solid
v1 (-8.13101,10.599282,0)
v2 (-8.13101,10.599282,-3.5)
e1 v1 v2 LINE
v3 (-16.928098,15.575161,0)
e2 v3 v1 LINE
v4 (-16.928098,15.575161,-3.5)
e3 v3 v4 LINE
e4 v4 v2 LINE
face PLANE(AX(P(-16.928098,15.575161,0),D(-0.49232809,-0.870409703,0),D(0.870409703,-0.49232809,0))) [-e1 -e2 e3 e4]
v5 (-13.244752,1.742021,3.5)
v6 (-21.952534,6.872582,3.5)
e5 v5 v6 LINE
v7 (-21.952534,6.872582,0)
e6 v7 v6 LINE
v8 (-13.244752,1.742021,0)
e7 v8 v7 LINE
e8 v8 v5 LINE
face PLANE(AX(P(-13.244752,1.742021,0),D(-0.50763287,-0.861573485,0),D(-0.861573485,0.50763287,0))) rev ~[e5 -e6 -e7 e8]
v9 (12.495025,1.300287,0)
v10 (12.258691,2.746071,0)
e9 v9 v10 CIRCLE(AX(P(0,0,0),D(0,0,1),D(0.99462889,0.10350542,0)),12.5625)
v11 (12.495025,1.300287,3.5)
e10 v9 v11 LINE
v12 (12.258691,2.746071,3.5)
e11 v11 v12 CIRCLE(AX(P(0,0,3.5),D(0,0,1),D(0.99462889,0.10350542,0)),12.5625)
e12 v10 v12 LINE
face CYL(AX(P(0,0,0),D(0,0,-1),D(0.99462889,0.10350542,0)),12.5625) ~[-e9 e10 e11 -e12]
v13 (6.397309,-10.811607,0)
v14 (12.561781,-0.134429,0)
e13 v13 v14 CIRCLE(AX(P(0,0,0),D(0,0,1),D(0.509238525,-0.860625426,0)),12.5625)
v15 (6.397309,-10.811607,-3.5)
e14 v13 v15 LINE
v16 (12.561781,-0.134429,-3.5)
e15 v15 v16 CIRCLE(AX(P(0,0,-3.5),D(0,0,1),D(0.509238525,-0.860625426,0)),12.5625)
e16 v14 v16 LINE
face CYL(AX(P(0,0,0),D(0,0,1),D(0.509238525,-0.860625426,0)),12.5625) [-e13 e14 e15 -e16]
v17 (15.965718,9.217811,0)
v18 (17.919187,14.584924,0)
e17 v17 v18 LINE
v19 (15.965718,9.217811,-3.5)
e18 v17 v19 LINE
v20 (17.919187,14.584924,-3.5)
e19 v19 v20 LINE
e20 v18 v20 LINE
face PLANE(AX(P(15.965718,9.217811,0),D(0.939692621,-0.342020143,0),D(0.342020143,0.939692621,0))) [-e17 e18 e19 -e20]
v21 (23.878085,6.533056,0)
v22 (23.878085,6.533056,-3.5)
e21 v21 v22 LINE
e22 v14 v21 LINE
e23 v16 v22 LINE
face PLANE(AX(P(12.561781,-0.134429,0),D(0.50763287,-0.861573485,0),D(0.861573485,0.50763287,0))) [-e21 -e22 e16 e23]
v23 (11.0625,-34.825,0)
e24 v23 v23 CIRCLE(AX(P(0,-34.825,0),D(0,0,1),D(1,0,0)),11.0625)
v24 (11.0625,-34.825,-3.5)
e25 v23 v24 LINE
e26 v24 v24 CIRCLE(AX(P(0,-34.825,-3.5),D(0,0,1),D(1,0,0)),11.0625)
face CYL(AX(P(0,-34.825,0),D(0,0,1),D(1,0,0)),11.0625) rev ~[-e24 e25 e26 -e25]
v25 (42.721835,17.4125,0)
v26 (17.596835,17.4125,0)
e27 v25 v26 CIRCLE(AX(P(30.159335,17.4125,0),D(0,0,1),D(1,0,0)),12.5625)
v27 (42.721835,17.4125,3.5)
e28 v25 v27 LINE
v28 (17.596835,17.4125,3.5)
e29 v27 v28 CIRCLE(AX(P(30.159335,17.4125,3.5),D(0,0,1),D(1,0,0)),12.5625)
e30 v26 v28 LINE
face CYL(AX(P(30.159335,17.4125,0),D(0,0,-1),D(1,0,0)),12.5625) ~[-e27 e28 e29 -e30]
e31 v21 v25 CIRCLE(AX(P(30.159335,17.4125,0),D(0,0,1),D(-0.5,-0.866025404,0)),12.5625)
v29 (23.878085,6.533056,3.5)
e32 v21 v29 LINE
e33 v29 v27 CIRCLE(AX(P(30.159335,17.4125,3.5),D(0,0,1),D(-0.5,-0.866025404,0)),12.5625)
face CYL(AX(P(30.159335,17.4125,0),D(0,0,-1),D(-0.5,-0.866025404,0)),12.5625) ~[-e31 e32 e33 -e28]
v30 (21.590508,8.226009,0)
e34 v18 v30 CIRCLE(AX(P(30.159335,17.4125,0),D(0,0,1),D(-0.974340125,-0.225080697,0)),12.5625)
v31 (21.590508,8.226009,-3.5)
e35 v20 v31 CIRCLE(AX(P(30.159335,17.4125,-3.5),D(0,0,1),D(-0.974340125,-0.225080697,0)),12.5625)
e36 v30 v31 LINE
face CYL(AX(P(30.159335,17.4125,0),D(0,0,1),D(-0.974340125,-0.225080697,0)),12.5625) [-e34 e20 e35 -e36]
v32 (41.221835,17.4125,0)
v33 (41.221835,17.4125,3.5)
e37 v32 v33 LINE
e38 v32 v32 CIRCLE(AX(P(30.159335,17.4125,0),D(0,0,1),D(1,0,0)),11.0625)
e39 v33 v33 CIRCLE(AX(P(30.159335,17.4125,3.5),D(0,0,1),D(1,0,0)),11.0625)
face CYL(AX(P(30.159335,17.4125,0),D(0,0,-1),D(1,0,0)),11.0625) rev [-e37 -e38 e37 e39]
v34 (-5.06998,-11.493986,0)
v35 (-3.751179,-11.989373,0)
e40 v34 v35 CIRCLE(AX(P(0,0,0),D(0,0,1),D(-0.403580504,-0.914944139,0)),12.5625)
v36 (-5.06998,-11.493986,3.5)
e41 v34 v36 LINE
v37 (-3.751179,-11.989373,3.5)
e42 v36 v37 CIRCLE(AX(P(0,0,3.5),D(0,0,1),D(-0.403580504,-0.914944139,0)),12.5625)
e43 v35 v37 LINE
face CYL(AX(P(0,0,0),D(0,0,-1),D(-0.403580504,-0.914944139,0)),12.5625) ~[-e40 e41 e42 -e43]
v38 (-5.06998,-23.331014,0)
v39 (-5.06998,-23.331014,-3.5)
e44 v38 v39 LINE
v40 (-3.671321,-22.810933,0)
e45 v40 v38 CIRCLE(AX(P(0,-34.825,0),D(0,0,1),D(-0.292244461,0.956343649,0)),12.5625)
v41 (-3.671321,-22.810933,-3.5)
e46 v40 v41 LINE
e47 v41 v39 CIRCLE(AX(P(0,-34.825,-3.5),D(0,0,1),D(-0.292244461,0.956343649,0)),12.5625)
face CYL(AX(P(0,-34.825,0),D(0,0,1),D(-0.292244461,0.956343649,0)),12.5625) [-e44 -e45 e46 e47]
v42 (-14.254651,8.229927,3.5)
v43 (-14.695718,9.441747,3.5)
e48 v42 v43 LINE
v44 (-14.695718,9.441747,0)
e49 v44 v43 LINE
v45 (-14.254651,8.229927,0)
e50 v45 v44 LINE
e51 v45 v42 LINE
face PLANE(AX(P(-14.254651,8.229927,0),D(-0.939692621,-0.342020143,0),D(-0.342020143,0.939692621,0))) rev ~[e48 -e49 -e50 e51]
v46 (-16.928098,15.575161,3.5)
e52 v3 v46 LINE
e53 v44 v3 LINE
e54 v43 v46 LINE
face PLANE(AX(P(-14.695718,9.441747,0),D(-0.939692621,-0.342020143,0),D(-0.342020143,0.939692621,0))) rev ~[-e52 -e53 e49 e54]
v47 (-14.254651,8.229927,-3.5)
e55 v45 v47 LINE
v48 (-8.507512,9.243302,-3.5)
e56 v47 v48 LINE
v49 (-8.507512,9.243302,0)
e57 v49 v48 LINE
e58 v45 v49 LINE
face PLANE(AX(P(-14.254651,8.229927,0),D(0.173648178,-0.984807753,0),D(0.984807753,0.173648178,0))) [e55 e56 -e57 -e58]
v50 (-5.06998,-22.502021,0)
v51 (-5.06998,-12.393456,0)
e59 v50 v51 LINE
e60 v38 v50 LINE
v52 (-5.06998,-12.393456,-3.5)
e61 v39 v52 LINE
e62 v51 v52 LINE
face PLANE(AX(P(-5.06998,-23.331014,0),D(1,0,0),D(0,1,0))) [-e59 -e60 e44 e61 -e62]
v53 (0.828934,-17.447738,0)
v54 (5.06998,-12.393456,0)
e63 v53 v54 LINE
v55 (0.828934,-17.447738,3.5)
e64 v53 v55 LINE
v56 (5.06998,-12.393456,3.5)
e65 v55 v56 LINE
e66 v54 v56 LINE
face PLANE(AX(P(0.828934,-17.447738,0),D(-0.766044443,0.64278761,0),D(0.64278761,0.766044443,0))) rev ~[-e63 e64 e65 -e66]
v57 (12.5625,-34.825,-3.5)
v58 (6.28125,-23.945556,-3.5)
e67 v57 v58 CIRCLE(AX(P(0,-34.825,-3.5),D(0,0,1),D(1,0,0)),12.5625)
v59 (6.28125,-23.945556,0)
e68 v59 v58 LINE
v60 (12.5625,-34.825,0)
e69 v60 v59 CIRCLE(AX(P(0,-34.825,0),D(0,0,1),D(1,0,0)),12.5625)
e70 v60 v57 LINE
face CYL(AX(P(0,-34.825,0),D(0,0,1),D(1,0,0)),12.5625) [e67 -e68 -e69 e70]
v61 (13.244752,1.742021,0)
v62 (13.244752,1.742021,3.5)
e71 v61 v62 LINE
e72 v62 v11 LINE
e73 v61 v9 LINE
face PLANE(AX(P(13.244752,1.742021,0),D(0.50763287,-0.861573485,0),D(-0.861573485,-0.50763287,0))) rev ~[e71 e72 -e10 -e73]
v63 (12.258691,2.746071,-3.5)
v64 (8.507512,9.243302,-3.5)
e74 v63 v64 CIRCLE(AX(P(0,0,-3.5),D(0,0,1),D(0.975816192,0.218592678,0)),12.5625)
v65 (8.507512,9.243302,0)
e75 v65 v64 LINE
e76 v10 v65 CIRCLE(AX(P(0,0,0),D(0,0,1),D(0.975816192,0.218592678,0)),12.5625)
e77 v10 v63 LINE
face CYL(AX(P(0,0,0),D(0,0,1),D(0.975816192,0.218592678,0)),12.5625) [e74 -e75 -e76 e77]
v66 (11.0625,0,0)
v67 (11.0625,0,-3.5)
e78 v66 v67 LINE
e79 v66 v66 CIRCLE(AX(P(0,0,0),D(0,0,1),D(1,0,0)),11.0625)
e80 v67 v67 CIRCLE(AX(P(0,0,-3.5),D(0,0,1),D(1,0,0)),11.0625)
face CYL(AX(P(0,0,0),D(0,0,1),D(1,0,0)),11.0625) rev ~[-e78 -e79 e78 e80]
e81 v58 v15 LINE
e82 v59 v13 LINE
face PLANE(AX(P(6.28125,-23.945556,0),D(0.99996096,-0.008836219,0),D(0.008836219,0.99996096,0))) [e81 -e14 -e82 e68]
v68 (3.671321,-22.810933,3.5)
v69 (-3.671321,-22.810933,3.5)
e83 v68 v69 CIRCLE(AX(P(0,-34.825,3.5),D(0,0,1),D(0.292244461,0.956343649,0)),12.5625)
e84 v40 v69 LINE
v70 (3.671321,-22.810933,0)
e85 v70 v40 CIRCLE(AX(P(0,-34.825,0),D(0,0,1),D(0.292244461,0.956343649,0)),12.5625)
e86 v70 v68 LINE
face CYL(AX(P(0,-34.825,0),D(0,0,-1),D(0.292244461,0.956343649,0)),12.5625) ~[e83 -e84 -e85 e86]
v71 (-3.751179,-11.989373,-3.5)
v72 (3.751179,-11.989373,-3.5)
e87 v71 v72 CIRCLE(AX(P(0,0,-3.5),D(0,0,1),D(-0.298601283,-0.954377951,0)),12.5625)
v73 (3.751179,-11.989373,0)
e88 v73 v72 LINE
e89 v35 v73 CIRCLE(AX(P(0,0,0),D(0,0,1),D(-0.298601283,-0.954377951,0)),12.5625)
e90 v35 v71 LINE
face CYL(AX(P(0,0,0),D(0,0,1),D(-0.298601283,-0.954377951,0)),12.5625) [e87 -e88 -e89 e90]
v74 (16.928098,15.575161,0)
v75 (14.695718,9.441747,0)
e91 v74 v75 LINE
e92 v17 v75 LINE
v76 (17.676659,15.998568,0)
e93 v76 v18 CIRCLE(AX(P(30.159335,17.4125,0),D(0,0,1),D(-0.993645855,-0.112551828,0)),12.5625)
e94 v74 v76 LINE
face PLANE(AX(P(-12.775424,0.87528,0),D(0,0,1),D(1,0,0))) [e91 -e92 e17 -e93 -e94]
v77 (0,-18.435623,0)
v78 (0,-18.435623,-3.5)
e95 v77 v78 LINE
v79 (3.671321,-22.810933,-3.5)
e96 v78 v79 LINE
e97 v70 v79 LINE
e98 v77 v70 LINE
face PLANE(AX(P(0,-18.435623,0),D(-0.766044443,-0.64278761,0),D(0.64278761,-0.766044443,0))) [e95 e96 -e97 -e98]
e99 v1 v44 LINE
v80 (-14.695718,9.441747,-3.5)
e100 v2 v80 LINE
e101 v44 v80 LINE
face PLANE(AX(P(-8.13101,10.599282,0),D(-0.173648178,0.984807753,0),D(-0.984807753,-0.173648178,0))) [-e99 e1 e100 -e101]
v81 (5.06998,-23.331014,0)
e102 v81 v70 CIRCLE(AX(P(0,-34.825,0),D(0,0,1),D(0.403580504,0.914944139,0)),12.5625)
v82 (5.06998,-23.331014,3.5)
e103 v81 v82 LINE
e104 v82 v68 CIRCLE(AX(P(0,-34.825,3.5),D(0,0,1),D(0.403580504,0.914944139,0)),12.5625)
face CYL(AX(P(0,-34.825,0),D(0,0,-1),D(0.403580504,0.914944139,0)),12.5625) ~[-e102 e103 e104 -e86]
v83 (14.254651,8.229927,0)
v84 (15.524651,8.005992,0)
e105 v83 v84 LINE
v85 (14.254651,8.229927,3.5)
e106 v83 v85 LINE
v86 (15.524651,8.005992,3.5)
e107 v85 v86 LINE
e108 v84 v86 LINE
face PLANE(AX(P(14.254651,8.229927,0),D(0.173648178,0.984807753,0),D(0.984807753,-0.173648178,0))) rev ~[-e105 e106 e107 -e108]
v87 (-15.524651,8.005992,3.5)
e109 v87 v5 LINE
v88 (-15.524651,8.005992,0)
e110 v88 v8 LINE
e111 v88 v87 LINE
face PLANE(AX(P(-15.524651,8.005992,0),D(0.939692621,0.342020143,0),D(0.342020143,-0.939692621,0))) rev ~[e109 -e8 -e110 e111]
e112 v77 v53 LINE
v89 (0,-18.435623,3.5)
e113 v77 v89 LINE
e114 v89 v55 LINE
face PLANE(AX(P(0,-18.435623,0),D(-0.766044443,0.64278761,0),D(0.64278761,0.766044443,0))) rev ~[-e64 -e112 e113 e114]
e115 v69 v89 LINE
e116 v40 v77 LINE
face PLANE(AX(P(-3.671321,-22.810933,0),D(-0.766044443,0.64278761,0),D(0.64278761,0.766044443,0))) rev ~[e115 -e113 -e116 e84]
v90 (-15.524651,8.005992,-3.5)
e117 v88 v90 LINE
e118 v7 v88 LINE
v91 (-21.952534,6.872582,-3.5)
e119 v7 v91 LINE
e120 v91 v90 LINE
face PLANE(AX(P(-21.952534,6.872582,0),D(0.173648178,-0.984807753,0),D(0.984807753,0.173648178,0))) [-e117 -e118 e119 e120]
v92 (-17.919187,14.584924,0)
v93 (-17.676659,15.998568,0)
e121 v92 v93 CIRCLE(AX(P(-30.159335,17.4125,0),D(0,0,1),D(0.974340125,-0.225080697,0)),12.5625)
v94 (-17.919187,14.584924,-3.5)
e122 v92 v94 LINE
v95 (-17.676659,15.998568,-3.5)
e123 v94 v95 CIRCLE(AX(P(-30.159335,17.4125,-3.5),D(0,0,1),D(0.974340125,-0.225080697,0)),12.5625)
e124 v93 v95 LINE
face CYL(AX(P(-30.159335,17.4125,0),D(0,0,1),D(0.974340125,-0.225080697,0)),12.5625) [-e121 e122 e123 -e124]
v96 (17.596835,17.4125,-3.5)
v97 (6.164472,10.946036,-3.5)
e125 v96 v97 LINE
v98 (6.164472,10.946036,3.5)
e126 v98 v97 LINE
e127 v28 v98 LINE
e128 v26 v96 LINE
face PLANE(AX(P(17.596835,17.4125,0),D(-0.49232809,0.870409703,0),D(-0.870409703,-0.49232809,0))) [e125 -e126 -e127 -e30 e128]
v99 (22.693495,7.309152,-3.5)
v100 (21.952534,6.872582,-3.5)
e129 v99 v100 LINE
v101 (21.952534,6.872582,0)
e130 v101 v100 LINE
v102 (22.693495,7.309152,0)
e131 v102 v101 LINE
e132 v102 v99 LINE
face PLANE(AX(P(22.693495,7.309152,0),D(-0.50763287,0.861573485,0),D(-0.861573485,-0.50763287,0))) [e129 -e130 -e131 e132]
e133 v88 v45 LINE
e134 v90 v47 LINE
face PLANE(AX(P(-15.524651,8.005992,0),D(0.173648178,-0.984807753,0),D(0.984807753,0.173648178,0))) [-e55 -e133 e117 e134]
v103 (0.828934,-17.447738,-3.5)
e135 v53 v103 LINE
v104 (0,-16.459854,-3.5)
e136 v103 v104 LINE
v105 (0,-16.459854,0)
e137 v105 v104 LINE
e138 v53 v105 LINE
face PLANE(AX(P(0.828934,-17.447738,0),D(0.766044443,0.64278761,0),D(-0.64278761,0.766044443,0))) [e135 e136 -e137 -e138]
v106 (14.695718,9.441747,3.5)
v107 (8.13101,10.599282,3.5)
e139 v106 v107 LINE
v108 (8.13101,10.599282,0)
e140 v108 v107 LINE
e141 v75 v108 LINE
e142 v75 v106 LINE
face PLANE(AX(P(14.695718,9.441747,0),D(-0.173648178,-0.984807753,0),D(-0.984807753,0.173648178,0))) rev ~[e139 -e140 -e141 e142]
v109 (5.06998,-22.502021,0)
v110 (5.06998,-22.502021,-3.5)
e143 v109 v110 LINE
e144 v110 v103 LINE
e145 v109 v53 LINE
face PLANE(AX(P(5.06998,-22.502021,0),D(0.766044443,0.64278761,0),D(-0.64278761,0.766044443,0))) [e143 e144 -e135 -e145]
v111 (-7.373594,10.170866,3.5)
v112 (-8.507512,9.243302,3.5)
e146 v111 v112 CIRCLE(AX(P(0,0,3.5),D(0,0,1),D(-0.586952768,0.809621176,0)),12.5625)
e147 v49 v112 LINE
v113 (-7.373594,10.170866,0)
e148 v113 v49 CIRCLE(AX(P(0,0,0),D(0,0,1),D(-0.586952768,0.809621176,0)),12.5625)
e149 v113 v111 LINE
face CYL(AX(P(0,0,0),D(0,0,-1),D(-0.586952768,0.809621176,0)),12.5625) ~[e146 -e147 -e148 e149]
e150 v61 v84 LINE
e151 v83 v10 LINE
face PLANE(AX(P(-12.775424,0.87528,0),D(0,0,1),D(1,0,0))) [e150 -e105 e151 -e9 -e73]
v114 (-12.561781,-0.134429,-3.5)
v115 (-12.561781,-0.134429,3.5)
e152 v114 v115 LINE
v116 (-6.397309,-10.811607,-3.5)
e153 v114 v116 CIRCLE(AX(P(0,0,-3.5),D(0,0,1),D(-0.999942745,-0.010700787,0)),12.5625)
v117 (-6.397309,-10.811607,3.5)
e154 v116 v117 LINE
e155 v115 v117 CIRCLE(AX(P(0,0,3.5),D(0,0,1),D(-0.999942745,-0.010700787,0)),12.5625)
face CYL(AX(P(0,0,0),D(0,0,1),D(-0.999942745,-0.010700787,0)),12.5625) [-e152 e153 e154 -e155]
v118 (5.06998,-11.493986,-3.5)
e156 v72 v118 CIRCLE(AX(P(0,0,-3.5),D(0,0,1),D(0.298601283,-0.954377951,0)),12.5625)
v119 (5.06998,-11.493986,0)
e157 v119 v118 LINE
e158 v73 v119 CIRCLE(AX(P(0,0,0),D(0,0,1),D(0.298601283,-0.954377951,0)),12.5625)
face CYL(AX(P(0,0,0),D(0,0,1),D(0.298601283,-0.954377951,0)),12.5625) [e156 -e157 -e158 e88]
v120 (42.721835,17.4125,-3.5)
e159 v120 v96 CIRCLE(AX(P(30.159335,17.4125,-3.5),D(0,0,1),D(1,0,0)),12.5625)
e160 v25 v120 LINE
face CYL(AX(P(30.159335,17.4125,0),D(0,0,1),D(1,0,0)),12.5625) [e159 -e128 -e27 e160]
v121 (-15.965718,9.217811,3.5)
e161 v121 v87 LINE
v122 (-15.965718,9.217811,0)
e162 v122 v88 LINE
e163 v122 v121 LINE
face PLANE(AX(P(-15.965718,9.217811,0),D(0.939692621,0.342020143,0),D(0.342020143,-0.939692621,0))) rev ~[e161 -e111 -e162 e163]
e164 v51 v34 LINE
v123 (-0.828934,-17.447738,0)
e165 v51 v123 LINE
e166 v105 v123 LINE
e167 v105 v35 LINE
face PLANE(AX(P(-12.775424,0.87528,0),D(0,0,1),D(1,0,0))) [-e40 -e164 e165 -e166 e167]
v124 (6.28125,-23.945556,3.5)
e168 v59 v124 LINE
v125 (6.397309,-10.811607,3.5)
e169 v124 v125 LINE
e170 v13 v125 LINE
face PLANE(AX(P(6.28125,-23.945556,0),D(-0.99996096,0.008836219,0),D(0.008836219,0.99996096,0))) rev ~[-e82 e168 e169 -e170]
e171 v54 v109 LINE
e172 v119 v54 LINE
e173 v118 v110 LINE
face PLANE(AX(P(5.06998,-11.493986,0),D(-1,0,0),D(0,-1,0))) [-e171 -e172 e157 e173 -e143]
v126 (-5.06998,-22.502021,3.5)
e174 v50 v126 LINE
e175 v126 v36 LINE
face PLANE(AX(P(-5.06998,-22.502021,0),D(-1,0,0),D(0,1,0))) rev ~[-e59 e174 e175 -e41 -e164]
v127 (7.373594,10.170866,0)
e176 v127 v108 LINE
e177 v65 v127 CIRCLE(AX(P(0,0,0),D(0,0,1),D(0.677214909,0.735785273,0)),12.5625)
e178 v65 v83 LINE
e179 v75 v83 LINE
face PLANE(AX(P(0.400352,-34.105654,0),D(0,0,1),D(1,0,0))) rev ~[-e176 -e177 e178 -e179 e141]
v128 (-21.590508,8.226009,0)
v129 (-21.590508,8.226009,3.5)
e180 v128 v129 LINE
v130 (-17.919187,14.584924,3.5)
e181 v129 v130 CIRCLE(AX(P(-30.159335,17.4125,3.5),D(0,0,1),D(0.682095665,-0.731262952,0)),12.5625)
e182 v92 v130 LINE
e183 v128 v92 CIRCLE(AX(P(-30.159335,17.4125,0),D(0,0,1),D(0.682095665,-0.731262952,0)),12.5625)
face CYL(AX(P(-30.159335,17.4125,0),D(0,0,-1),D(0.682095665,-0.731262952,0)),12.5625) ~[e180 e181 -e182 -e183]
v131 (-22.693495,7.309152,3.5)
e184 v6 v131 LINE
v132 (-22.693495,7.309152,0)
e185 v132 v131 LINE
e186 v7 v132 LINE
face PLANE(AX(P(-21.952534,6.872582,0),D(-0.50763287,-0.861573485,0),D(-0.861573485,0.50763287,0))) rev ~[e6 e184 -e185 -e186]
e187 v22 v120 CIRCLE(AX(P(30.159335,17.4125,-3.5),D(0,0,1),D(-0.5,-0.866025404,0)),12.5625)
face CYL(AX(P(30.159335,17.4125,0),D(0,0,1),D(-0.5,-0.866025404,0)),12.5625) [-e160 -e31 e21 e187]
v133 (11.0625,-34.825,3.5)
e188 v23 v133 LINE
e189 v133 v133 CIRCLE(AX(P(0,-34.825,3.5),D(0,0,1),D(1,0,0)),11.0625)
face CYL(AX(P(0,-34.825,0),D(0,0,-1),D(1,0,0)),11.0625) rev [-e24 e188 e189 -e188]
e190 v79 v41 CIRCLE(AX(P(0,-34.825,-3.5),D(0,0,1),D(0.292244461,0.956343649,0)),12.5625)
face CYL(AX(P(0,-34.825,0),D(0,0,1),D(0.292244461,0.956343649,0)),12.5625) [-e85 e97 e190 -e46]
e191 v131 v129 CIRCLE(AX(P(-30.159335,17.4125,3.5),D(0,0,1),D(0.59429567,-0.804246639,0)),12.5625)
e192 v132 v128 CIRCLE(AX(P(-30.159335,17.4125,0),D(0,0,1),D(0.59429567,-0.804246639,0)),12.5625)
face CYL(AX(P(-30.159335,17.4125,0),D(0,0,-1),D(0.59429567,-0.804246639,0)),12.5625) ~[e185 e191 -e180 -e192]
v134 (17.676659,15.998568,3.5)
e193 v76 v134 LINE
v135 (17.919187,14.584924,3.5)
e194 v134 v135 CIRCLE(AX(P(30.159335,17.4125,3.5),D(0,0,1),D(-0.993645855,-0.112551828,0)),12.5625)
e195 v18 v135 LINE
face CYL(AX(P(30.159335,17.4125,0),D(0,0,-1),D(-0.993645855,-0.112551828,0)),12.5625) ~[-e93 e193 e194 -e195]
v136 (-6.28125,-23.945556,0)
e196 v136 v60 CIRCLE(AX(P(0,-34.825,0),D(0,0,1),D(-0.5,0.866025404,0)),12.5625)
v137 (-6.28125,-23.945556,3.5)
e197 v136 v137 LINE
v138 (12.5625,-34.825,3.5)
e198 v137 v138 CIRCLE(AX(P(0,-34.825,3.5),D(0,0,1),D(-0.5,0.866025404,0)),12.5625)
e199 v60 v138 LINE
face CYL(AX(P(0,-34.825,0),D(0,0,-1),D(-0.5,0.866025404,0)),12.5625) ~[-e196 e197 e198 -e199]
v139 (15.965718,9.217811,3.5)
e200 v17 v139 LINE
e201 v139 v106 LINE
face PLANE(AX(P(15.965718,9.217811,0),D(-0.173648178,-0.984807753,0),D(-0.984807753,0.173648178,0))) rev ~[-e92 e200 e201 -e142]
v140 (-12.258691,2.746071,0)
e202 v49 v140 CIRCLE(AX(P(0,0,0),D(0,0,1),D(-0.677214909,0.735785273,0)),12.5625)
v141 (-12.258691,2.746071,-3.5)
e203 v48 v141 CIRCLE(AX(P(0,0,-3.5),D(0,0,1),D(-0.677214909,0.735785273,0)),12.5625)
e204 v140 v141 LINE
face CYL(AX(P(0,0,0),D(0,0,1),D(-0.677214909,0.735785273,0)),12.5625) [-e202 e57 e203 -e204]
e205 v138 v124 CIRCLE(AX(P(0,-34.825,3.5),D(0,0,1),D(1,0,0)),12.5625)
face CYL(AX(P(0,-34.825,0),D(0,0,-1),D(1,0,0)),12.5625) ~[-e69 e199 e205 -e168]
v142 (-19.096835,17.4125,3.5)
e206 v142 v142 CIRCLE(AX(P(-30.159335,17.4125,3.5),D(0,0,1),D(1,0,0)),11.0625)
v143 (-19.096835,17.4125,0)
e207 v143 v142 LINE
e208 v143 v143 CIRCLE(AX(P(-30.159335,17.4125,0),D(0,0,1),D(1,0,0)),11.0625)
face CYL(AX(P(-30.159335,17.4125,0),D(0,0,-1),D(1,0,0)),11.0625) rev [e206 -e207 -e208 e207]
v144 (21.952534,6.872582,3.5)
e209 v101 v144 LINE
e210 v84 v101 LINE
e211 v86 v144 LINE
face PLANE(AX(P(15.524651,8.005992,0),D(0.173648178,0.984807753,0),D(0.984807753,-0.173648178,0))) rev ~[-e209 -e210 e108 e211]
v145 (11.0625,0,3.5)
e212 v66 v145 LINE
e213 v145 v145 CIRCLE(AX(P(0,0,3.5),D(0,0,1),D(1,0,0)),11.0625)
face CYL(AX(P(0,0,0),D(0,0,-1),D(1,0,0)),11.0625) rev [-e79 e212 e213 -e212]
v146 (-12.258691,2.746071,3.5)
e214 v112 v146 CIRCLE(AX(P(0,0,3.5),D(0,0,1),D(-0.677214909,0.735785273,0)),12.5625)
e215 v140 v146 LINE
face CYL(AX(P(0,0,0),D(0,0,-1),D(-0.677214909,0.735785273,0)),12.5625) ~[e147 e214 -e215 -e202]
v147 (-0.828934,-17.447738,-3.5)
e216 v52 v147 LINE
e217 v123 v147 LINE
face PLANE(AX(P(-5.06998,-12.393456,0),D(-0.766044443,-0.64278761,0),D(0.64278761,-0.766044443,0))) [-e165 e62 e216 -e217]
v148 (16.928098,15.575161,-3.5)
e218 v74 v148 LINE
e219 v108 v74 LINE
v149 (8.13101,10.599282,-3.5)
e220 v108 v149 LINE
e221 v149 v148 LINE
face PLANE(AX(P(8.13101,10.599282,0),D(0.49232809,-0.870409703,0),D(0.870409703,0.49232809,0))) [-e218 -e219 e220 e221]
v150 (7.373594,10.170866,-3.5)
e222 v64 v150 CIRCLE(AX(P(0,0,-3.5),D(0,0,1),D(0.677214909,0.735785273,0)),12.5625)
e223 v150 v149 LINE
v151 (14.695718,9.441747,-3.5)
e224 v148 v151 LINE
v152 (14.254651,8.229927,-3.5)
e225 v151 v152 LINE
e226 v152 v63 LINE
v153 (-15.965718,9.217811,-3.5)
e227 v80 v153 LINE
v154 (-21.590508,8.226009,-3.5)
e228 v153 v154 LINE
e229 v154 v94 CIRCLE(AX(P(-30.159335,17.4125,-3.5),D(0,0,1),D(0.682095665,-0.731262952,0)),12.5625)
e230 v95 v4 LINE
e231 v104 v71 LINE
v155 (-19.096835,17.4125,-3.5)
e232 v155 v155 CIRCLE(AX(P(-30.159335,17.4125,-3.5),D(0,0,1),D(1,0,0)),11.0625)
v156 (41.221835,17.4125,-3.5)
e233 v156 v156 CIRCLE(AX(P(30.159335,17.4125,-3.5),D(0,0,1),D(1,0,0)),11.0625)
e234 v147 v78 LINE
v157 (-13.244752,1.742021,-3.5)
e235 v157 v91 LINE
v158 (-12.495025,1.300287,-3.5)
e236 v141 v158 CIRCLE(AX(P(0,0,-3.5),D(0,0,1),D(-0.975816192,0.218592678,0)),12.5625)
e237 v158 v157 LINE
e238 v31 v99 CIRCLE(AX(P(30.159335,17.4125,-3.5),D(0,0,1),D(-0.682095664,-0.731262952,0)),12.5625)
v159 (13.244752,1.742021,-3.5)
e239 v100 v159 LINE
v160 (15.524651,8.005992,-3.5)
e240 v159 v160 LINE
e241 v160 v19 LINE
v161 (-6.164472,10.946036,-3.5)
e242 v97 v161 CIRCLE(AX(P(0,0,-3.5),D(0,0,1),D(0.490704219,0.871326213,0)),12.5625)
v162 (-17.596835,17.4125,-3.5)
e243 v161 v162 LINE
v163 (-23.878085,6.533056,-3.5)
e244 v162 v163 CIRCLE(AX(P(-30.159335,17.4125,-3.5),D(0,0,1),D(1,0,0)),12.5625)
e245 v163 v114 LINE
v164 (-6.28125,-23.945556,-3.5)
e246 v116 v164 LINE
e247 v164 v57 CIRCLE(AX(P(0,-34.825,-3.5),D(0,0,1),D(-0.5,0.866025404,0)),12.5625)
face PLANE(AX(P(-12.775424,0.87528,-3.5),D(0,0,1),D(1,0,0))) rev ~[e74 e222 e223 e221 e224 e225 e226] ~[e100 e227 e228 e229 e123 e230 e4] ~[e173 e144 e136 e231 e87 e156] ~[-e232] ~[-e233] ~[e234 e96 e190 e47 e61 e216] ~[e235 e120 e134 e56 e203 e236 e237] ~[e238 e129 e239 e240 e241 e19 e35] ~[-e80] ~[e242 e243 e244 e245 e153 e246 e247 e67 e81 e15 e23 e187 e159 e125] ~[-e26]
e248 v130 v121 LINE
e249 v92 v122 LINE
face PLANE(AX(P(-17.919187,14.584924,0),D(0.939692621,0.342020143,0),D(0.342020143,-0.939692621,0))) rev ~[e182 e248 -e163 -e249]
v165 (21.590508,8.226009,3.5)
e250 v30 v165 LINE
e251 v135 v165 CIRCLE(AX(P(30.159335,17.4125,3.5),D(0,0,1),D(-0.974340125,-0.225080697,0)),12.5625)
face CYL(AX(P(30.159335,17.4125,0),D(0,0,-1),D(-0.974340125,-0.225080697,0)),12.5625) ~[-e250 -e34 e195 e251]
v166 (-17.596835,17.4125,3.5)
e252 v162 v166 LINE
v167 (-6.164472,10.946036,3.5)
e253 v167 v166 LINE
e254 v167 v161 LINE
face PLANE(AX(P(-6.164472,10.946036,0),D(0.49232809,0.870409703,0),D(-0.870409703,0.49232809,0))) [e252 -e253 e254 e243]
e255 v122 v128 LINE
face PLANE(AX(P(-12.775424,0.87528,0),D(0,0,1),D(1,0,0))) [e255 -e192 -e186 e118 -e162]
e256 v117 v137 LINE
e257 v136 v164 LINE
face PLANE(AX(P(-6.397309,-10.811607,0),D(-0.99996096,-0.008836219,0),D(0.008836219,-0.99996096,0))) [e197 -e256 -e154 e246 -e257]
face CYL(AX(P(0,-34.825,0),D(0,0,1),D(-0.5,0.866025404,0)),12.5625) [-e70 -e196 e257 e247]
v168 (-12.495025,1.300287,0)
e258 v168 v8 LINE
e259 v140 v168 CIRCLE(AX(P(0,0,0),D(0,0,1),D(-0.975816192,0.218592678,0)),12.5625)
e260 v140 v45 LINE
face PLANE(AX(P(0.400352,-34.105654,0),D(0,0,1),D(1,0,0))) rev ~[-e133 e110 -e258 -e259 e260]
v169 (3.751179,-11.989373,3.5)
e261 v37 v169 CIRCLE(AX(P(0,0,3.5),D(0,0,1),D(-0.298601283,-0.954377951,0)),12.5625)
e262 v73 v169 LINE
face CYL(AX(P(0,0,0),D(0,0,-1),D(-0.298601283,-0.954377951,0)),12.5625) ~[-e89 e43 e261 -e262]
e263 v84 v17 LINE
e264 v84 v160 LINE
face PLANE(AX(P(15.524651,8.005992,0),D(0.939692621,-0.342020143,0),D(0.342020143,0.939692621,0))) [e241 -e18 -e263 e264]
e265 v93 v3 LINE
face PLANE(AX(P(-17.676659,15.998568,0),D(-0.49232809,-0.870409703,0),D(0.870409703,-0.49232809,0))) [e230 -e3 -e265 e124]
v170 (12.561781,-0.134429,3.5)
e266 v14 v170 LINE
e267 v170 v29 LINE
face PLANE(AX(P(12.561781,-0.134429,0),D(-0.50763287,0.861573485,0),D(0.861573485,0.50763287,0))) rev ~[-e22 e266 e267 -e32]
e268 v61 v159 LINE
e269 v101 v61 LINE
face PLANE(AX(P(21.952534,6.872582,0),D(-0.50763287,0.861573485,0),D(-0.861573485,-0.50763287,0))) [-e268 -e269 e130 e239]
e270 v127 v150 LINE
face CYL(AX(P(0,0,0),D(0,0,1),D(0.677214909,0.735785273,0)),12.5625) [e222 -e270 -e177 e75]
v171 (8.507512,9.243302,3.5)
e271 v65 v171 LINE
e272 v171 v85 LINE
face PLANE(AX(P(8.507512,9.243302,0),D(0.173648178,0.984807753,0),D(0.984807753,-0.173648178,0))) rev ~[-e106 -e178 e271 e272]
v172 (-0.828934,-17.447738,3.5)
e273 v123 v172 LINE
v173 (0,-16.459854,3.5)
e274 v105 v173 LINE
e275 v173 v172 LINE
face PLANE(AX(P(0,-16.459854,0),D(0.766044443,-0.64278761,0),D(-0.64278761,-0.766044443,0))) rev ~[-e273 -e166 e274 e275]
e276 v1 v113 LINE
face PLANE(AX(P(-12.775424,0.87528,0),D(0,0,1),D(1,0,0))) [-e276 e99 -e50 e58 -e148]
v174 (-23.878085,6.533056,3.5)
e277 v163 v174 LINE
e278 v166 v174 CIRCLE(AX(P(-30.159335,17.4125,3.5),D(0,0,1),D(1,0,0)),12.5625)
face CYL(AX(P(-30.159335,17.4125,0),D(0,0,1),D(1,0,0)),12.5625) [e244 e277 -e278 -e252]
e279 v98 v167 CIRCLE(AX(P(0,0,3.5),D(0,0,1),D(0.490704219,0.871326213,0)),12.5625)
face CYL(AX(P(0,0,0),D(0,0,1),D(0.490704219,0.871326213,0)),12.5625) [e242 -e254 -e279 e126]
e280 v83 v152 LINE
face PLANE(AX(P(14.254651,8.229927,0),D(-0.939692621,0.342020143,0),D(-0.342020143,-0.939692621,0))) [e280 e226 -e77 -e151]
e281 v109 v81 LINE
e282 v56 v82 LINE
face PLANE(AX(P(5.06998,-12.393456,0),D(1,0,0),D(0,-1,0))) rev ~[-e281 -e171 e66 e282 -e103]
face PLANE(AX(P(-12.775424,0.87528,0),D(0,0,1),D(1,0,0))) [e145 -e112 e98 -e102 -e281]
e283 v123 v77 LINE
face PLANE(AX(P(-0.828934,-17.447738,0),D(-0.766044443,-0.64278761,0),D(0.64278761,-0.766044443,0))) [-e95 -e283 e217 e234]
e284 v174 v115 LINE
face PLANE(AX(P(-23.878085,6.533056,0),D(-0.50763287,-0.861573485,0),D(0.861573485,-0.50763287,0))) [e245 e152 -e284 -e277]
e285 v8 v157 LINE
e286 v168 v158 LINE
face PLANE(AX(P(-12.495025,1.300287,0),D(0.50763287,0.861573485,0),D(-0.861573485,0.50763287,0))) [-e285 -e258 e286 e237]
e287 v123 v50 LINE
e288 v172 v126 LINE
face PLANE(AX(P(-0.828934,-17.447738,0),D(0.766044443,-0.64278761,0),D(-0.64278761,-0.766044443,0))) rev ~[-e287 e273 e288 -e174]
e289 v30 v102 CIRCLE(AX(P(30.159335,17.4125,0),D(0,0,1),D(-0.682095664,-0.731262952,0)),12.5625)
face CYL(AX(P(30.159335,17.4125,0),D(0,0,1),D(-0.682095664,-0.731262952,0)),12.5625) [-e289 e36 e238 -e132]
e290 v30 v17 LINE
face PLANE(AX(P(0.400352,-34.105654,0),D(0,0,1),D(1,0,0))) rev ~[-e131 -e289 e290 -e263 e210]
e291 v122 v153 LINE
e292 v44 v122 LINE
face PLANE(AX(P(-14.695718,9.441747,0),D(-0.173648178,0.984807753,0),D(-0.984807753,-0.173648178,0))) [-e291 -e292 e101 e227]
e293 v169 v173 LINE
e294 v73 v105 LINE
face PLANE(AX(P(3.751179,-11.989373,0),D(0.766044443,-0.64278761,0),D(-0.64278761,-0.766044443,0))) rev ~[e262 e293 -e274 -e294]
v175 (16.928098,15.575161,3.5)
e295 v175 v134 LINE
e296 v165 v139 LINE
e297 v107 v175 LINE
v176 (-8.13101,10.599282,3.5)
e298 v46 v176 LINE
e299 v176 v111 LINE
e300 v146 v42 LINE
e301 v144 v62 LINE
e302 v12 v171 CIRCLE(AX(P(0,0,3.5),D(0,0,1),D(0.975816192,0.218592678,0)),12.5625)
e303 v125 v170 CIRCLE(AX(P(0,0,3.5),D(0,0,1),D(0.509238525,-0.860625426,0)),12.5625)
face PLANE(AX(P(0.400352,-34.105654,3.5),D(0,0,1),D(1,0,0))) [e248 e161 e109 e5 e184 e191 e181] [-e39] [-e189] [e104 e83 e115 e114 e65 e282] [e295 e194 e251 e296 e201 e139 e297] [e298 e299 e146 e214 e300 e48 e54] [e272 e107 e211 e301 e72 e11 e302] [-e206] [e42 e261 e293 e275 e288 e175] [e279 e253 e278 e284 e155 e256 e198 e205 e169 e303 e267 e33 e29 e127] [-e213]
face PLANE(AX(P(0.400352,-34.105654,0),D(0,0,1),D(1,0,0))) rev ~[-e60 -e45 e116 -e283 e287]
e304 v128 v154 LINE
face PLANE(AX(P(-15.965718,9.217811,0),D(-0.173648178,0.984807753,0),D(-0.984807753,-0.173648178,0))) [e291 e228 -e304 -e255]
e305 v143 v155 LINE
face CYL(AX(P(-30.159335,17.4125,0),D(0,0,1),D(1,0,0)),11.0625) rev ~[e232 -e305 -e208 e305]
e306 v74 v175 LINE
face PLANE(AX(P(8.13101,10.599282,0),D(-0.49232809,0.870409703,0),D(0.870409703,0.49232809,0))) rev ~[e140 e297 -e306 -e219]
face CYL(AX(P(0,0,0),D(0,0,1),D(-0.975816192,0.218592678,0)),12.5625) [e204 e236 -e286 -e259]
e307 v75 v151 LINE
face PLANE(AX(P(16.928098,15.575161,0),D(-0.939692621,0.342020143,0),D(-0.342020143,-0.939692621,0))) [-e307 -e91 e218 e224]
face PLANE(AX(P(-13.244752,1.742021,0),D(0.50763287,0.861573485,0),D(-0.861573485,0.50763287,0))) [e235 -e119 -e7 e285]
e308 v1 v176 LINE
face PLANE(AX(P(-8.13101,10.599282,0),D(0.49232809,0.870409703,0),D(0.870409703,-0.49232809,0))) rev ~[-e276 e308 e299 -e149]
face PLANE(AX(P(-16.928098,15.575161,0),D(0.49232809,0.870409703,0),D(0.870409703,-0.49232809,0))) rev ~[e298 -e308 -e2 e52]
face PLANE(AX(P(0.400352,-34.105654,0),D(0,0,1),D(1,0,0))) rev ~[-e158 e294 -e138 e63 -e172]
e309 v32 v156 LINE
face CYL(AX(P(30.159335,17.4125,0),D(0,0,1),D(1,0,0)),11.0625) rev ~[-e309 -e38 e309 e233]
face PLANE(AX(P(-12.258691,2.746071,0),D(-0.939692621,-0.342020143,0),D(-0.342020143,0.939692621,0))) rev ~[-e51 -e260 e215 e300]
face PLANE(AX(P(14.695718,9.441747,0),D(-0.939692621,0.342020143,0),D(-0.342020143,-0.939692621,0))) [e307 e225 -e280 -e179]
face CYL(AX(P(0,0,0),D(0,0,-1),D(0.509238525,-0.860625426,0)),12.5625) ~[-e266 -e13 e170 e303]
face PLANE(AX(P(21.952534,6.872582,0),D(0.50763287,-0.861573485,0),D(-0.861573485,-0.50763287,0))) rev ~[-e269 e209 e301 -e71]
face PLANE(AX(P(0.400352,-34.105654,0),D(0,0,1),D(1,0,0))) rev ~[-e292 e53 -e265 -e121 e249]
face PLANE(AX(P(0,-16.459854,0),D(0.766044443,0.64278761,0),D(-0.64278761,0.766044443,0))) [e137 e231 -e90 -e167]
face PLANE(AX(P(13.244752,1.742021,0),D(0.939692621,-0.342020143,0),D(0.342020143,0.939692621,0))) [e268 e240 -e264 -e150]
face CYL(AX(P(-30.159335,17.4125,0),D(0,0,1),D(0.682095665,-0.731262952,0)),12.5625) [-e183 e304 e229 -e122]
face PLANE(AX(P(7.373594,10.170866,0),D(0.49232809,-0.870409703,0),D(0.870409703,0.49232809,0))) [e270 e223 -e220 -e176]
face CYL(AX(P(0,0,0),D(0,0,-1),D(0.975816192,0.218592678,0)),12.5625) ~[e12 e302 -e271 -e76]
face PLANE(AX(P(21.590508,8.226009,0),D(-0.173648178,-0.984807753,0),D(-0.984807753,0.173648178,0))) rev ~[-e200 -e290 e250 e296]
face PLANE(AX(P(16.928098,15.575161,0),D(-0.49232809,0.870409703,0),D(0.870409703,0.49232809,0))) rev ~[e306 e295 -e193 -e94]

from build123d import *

# Parameters (mm, degrees)
F0_R     = 11.0625
F1_DEPTH = 3.5
F2_DEPTH = 3.5


with BuildPart() as f1:
    # F0 (on Top) → F1 (new body)
    with BuildSketch(Plane.XY):
        with BuildLine():
            ThreePointArc((12.5625, -34.825), (10.879444135, -28.54375), (6.28125, -23.945555865))
            ThreePointArc((6.28125, -23.945555865), (5.6839265838, -23.6219028907), (5.0699800766, -23.3310142565))
            ThreePointArc((5.0699800766, -23.3310142565), (4.3783795457, -23.0501879504), (3.671321038, -22.8109329082))
            ThreePointArc((3.671321038, -22.8109329082), (0, -22.2625), (-3.671321038, -22.8109329082))
            ThreePointArc((-3.671321038, -22.8109329082), (-4.3783795457, -23.0501879504), (-5.0699800766, -23.3310142565))
            ThreePointArc((-5.0699800766, -23.3310142565), (-5.6839265838, -23.6219028907), (-6.28125, -23.945555865))
            ThreePointArc((-6.28125, -23.945555865), (-6.28125, -45.704444135), (12.5625, -34.825))
        make_face()
        with Locations((0, -34.825)):
            Circle(F0_R, mode=Mode.SUBTRACT)
        with BuildLine():
            ThreePointArc((22.6934953293, 7.3091515977), (23.2748450472, 6.9043979519), (23.8780846868, 6.533055865))
            ThreePointArc((23.8780846868, 6.533055865), (36.4405846868, 6.533055865), (42.7218346868, 17.4125))
            ThreePointArc((42.7218346868, 17.4125), (30.1593346868, 29.975), (17.5968346868, 17.4125))
            ThreePointArc((17.5968346868, 17.4125), (17.6168065478, 16.7044081041), (17.6766586284, 15.998567657))
            ThreePointArc((17.6766586284, 15.998567657), (17.777731299, 15.2882816033), (17.9191868635, 14.5849237385))
            ThreePointArc((17.9191868635, 14.5849237385), (19.2798905518, 11.13125), (21.5905079016, 8.2260091697))
            ThreePointArc((21.5905079016, 8.2260091697), (22.1289058982, 7.7518261249), (22.6934953293, 7.3091515977))
        make_face()
        with Locations((30.1593346868, 17.4125)):
            Circle(F0_R, mode=Mode.SUBTRACT)
        with BuildLine():
            ThreePointArc((-17.6766586284, 15.998567657), (-17.6168065478, 16.7044081041), (-17.5968346868, 17.4125))
            ThreePointArc((-17.5968346868, 17.4125), (-41.0387788218, 23.69375), (-23.8780846868, 6.533055865))
            ThreePointArc((-23.8780846868, 6.533055865), (-23.2748450472, 6.9043979519), (-22.6934953293, 7.3091515977))
            ThreePointArc((-22.6934953293, 7.3091515977), (-22.1289058982, 7.7518261249), (-21.5905079016, 8.2260091697))
            ThreePointArc((-21.5905079016, 8.2260091697), (-19.2798905518, 11.13125), (-17.9191868635, 14.5849237385))
            ThreePointArc((-17.9191868635, 14.5849237385), (-17.777731299, 15.2882816033), (-17.6766586284, 15.998567657))
        make_face()
        with Locations((-30.1593346868, 17.4125)):
            Circle(F0_R, mode=Mode.SUBTRACT)
        with BuildLine():
            ThreePointArc((12.5617807334, -0.134428631), (12.5623201821, -0.0672152776), (12.5625, 0))
            ThreePointArc((12.5625, 0), (12.5456200156, 0.6510181823), (12.4950254251, 1.300286844))
            ThreePointArc((12.4950254251, 1.300286844), (12.3979510712, 2.0266266272), (12.2586909143, 2.7460705232))
            ThreePointArc((12.2586909143, 2.7460705232), (10.879444135, 6.28125), (8.5075122908, 9.2433024873))
            ThreePointArc((8.5075122908, 9.2433024873), (7.9540856787, 9.723627269), (7.3735941516, 10.1708660171))
            ThreePointArc((7.3735941516, 10.1708660171), (6.7801201382, 10.5757447568), (6.1644717573, 10.9460355474))
            ThreePointArc((6.1644717573, 10.9460355474), (0, 12.5625), (-6.1644717573, 10.9460355474))
            ThreePointArc((-6.1644717573, 10.9460355474), (-6.7801201382, 10.5757447568), (-7.3735941516, 10.1708660171))
            ThreePointArc((-7.3735941516, 10.1708660171), (-7.9540856787, 9.723627269), (-8.5075122908, 9.2433024873))
            ThreePointArc((-8.5075122908, 9.2433024873), (-10.879444135, 6.28125), (-12.2586909143, 2.7460705232))
            ThreePointArc((-12.2586909143, 2.7460705232), (-12.3979510712, 2.0266266272), (-12.4950254251, 1.300286844))
            ThreePointArc((-12.4950254251, 1.300286844), (-12.5489236925, 0.583883902), (-12.5617807334, -0.134428631))
            ThreePointArc((-12.5617807334, -0.134428631), (-10.879444135, -6.28125), (-6.3973089761, -10.8116069164))
            ThreePointArc((-6.3973089761, -10.8116069164), (-5.7437870583, -11.1725250718), (-5.0699800766, -11.4939857435))
            ThreePointArc((-5.0699800766, -11.4939857435), (-4.4175289857, -11.760180437), (-3.7511786235, -11.9893730105))
            ThreePointArc((-3.7511786235, -11.9893730105), (0, -12.5625), (3.7511786235, -11.9893730105))
            ThreePointArc((3.7511786235, -11.9893730105), (4.4175289857, -11.760180437), (5.0699800766, -11.4939857435))
            ThreePointArc((5.0699800766, -11.4939857435), (5.7437870583, -11.1725250718), (6.3973089761, -10.8116069164))
            ThreePointArc((6.3973089761, -10.8116069164), (10.879444135, -6.28125), (12.5617807334, -0.134428631))
        make_face()
        Circle(F0_R, mode=Mode.SUBTRACT)
        with BuildLine():
            ThreePointArc((-22.6934953293, 7.3091515977), (-23.2748450472, 6.9043979519), (-23.8780846868, 6.533055865))
            Line((-23.8780846868, 6.533055865), (-21.9525338245, 6.8725824347))
            Line((-21.9525338245, 6.8725824347), (-22.6934953293, 7.3091515977))
        make_face()
        Polygon((-23.8780846868, 6.533055865), (-12.5617807334, -0.134428631), (-13.2447523803, 1.742020547), (-21.9525338245, 6.8725824347), align=None)
        with BuildLine():
            Line((-13.2447523803, 1.742020547), (-12.5617807334, -0.134428631))
            ThreePointArc((-12.5617807334, -0.134428631), (-12.5489236925, 0.583883902), (-12.4950254251, 1.300286844))
            Line((-12.4950254251, 1.300286844), (-13.2447523803, 1.742020547))
        make_face()
        Polygon((-8.1310102377, 10.5992817546), (-6.1644717573, 10.9460355474), (-17.5968346868, 17.4125), (-16.9280978903, 15.5751607521), align=None)
        with BuildLine():
            Line((-16.9280978903, 15.5751607521), (-17.5968346868, 17.4125))
            ThreePointArc((-17.5968346868, 17.4125), (-17.6168065478, 16.7044081041), (-17.6766586284, 15.998567657))
            Line((-17.6766586284, 15.998567657), (-16.9280978903, 15.5751607521))
        make_face()
        with BuildLine():
            ThreePointArc((-7.3735941516, 10.1708660171), (-6.7801201382, 10.5757447568), (-6.1644717573, 10.9460355474))
            Line((-6.1644717573, 10.9460355474), (-8.1310102377, 10.5992817546))
            Line((-8.1310102377, 10.5992817546), (-7.3735941516, 10.1708660171))
        make_face()
        with BuildLine():
            Line((-5.0699800766, -22.5020205822), (-6.28125, -23.945555865))
            ThreePointArc((-6.28125, -23.945555865), (-5.6839265838, -23.6219028907), (-5.0699800766, -23.3310142565))
            Line((-5.0699800766, -23.3310142565), (-5.0699800766, -22.5020205822))
        make_face()
        Polygon((-6.3973089761, -10.8116069164), (-6.28125, -23.945555865), (-5.0699800766, -22.5020205822), (-5.0699800766, -12.3934559009), align=None)
        with BuildLine():
            Line((-5.0699800766, -12.3934559009), (-5.0699800766, -11.4939857435))
            ThreePointArc((-5.0699800766, -11.4939857435), (-5.7437870583, -11.1725250718), (-6.3973089761, -10.8116069164))
            Line((-6.3973089761, -10.8116069164), (-5.0699800766, -12.3934559009))
        make_face()
        with BuildLine():
            Line((5.0699800766, -12.3934559009), (6.3973089761, -10.8116069164))
            ThreePointArc((6.3973089761, -10.8116069164), (5.7437870583, -11.1725250718), (5.0699800766, -11.4939857435))
            Line((5.0699800766, -11.4939857435), (5.0699800766, -12.3934559009))
        make_face()
        Polygon((6.28125, -23.945555865), (6.3973089761, -10.8116069164), (5.0699800766, -12.3934559009), (5.0699800766, -22.5020205822), align=None)
        with BuildLine():
            ThreePointArc((5.0699800766, -23.3310142565), (5.6839265838, -23.6219028907), (6.28125, -23.945555865))
            Line((6.28125, -23.945555865), (5.0699800766, -22.5020205822))
            Line((5.0699800766, -22.5020205822), (5.0699800766, -23.3310142565))
        make_face()
        with BuildLine():
            Line((-3.671321038, -22.8109329082), (0, -18.4356228716))
            Line((0, -18.4356228716), (-0.8289336287, -17.4477382415))
            Line((-0.8289336287, -17.4477382415), (-5.0699800766, -22.5020205822))
            Line((-5.0699800766, -22.5020205822), (-5.0699800766, -23.3310142565))
            ThreePointArc((-5.0699800766, -23.3310142565), (-4.3783795457, -23.0501879504), (-3.671321038, -22.8109329082))
        make_face()
        Polygon((0, -18.4356228716), (0.8289336287, -17.4477382415), (0, -16.4598536115), (-0.8289336287, -17.4477382415), align=None)
        with BuildLine():
            Line((5.0699800766, -12.3934559009), (5.0699800766, -11.4939857435))
            ThreePointArc((5.0699800766, -11.4939857435), (4.4175289857, -11.760180437), (3.7511786235, -11.9893730105))
            Line((3.7511786235, -11.9893730105), (0, -16.4598536115))
            Line((0, -16.4598536115), (0.8289336287, -17.4477382415))
            Line((0.8289336287, -17.4477382415), (5.0699800766, -12.3934559009))
        make_face()
        Polygon((13.2447523803, 1.742020547), (12.5617807334, -0.134428631), (23.8780846868, 6.533055865), (21.9525338245, 6.8725824347), align=None)
        with BuildLine():
            ThreePointArc((12.4950254251, 1.300286844), (12.5456200156, 0.6510181823), (12.5625, 0))
            ThreePointArc((12.5625, 0), (12.5623201821, -0.0672152776), (12.5617807334, -0.134428631))
            Line((12.5617807334, -0.134428631), (13.2447523803, 1.742020547))
            Line((13.2447523803, 1.742020547), (12.4950254251, 1.300286844))
        make_face()
        with BuildLine():
            Line((21.9525338245, 6.8725824347), (23.8780846868, 6.533055865))
            ThreePointArc((23.8780846868, 6.533055865), (23.2748450472, 6.9043979519), (22.6934953293, 7.3091515977))
            Line((22.6934953293, 7.3091515977), (21.9525338245, 6.8725824347))
        make_face()
        Polygon((16.9280978903, 15.5751607521), (17.5968346868, 17.4125), (6.1644717573, 10.9460355474), (8.1310102377, 10.5992817546), align=None)
        with BuildLine():
            ThreePointArc((6.1644717573, 10.9460355474), (6.7801201382, 10.5757447568), (7.3735941516, 10.1708660171))
            Line((7.3735941516, 10.1708660171), (8.1310102377, 10.5992817546))
            Line((8.1310102377, 10.5992817546), (6.1644717573, 10.9460355474))
        make_face()
        with BuildLine():
            ThreePointArc((17.6766586284, 15.998567657), (17.6168065478, 16.7044081041), (17.5968346868, 17.4125))
            Line((17.5968346868, 17.4125), (16.9280978903, 15.5751607521))
            Line((16.9280978903, 15.5751607521), (17.6766586284, 15.998567657))
        make_face()
        with BuildLine():
            Line((15.9657177414, 9.2178114358), (15.5246513701, 8.0059915402))
            Line((15.5246513701, 8.0059915402), (21.9525338245, 6.8725824347))
            Line((21.9525338245, 6.8725824347), (22.6934953293, 7.3091515977))
            ThreePointArc((22.6934953293, 7.3091515977), (22.1289058982, 7.7518261249), (21.5905079016, 8.2260091697))
            Line((21.5905079016, 8.2260091697), (15.9657177414, 9.2178114358))
        make_face()
        Polygon((14.6957177414, 9.4417467013), (14.2546513701, 8.2299268057), (15.5246513701, 8.0059915402), (15.9657177414, 9.2178114358), align=None)
        with BuildLine():
            ThreePointArc((7.3735941516, 10.1708660171), (7.9540856787, 9.723627269), (8.5075122908, 9.2433024873))
            Line((8.5075122908, 9.2433024873), (14.2546513701, 8.2299268057))
            Line((14.2546513701, 8.2299268057), (14.6957177414, 9.4417467013))
            Line((14.6957177414, 9.4417467013), (8.1310102377, 10.5992817546))
            Line((8.1310102377, 10.5992817546), (7.3735941516, 10.1708660171))
        make_face()
        with BuildLine():
            Line((-15.9657177414, 9.2178114358), (-14.6957177414, 9.4417467013))
            Line((-14.6957177414, 9.4417467013), (-16.9280978903, 15.5751607521))
            Line((-16.9280978903, 15.5751607521), (-17.6766586284, 15.998567657))
            ThreePointArc((-17.6766586284, 15.998567657), (-17.777731299, 15.2882816033), (-17.9191868635, 14.5849237385))
            Line((-17.9191868635, 14.5849237385), (-15.9657177414, 9.2178114358))
        make_face()
        Polygon((-14.2546513701, 8.2299268057), (-14.6957177414, 9.4417467013), (-15.9657177414, 9.2178114358), (-15.5246513701, 8.0059915402), align=None)
        with BuildLine():
            Line((-13.2447523803, 1.742020547), (-12.4950254251, 1.300286844))
            ThreePointArc((-12.4950254251, 1.300286844), (-12.3979510712, 2.0266266272), (-12.2586909143, 2.7460705232))
            Line((-12.2586909143, 2.7460705232), (-14.2546513701, 8.2299268057))
            Line((-14.2546513701, 8.2299268057), (-15.5246513701, 8.0059915402))
            Line((-15.5246513701, 8.0059915402), (-13.2447523803, 1.742020547))
        make_face()
    extrude(amount=F1_DEPTH)

    # F0 (on Top) → F2 (join)
    with BuildSketch(Plane.XY):
        with BuildLine():
            Line((-13.2447523803, 1.742020547), (-12.5617807334, -0.134428631))
            ThreePointArc((-12.5617807334, -0.134428631), (-12.5489236925, 0.583883902), (-12.4950254251, 1.300286844))
            Line((-12.4950254251, 1.300286844), (-13.2447523803, 1.742020547))
        make_face()
        Polygon((-23.8780846868, 6.533055865), (-12.5617807334, -0.134428631), (-13.2447523803, 1.742020547), (-21.9525338245, 6.8725824347), align=None)
        with BuildLine():
            ThreePointArc((-22.6934953293, 7.3091515977), (-23.2748450472, 6.9043979519), (-23.8780846868, 6.533055865))
            Line((-23.8780846868, 6.533055865), (-21.9525338245, 6.8725824347))
            Line((-21.9525338245, 6.8725824347), (-22.6934953293, 7.3091515977))
        make_face()
        with BuildLine():
            ThreePointArc((-17.6766586284, 15.998567657), (-17.6168065478, 16.7044081041), (-17.5968346868, 17.4125))
            ThreePointArc((-17.5968346868, 17.4125), (-41.0387788218, 23.69375), (-23.8780846868, 6.533055865))
            ThreePointArc((-23.8780846868, 6.533055865), (-23.2748450472, 6.9043979519), (-22.6934953293, 7.3091515977))
            ThreePointArc((-22.6934953293, 7.3091515977), (-22.1289058982, 7.7518261249), (-21.5905079016, 8.2260091697))
            ThreePointArc((-21.5905079016, 8.2260091697), (-19.2798905518, 11.13125), (-17.9191868635, 14.5849237385))
            ThreePointArc((-17.9191868635, 14.5849237385), (-17.777731299, 15.2882816033), (-17.6766586284, 15.998567657))
        make_face()
        with Locations((-30.1593346868, 17.4125)):
            Circle(F0_R, mode=Mode.SUBTRACT)
        with BuildLine():
            Line((-16.9280978903, 15.5751607521), (-17.5968346868, 17.4125))
            ThreePointArc((-17.5968346868, 17.4125), (-17.6168065478, 16.7044081041), (-17.6766586284, 15.998567657))
            Line((-17.6766586284, 15.998567657), (-16.9280978903, 15.5751607521))
        make_face()
        Polygon((-8.1310102377, 10.5992817546), (-6.1644717573, 10.9460355474), (-17.5968346868, 17.4125), (-16.9280978903, 15.5751607521), align=None)
        with BuildLine():
            ThreePointArc((-7.3735941516, 10.1708660171), (-6.7801201382, 10.5757447568), (-6.1644717573, 10.9460355474))
            Line((-6.1644717573, 10.9460355474), (-8.1310102377, 10.5992817546))
            Line((-8.1310102377, 10.5992817546), (-7.3735941516, 10.1708660171))
        make_face()
        with BuildLine():
            ThreePointArc((22.6934953293, 7.3091515977), (23.2748450472, 6.9043979519), (23.8780846868, 6.533055865))
            ThreePointArc((23.8780846868, 6.533055865), (36.4405846868, 6.533055865), (42.7218346868, 17.4125))
            ThreePointArc((42.7218346868, 17.4125), (30.1593346868, 29.975), (17.5968346868, 17.4125))
            ThreePointArc((17.5968346868, 17.4125), (17.6168065478, 16.7044081041), (17.6766586284, 15.998567657))
            ThreePointArc((17.6766586284, 15.998567657), (17.777731299, 15.2882816033), (17.9191868635, 14.5849237385))
            ThreePointArc((17.9191868635, 14.5849237385), (19.2798905518, 11.13125), (21.5905079016, 8.2260091697))
            ThreePointArc((21.5905079016, 8.2260091697), (22.1289058982, 7.7518261249), (22.6934953293, 7.3091515977))
        make_face()
        with Locations((30.1593346868, 17.4125)):
            Circle(F0_R, mode=Mode.SUBTRACT)
        with BuildLine():
            ThreePointArc((17.6766586284, 15.998567657), (17.6168065478, 16.7044081041), (17.5968346868, 17.4125))
            Line((17.5968346868, 17.4125), (16.9280978903, 15.5751607521))
            Line((16.9280978903, 15.5751607521), (17.6766586284, 15.998567657))
        make_face()
        Polygon((16.9280978903, 15.5751607521), (17.5968346868, 17.4125), (6.1644717573, 10.9460355474), (8.1310102377, 10.5992817546), align=None)
        with BuildLine():
            ThreePointArc((6.1644717573, 10.9460355474), (6.7801201382, 10.5757447568), (7.3735941516, 10.1708660171))
            Line((7.3735941516, 10.1708660171), (8.1310102377, 10.5992817546))
            Line((8.1310102377, 10.5992817546), (6.1644717573, 10.9460355474))
        make_face()
        Polygon((13.2447523803, 1.742020547), (12.5617807334, -0.134428631), (23.8780846868, 6.533055865), (21.9525338245, 6.8725824347), align=None)
        with BuildLine():
            Line((21.9525338245, 6.8725824347), (23.8780846868, 6.533055865))
            ThreePointArc((23.8780846868, 6.533055865), (23.2748450472, 6.9043979519), (22.6934953293, 7.3091515977))
            Line((22.6934953293, 7.3091515977), (21.9525338245, 6.8725824347))
        make_face()
        with BuildLine():
            ThreePointArc((12.4950254251, 1.300286844), (12.5456200156, 0.6510181823), (12.5625, 0))
            ThreePointArc((12.5625, 0), (12.5623201821, -0.0672152776), (12.5617807334, -0.134428631))
            Line((12.5617807334, -0.134428631), (13.2447523803, 1.742020547))
            Line((13.2447523803, 1.742020547), (12.4950254251, 1.300286844))
        make_face()
        with BuildLine():
            ThreePointArc((12.5625, -34.825), (10.879444135, -28.54375), (6.28125, -23.945555865))
            ThreePointArc((6.28125, -23.945555865), (5.6839265838, -23.6219028907), (5.0699800766, -23.3310142565))
            ThreePointArc((5.0699800766, -23.3310142565), (4.3783795457, -23.0501879504), (3.671321038, -22.8109329082))
            ThreePointArc((3.671321038, -22.8109329082), (0, -22.2625), (-3.671321038, -22.8109329082))
            ThreePointArc((-3.671321038, -22.8109329082), (-4.3783795457, -23.0501879504), (-5.0699800766, -23.3310142565))
            ThreePointArc((-5.0699800766, -23.3310142565), (-5.6839265838, -23.6219028907), (-6.28125, -23.945555865))
            ThreePointArc((-6.28125, -23.945555865), (-6.28125, -45.704444135), (12.5625, -34.825))
        make_face()
        with Locations((0, -34.825)):
            Circle(F0_R, mode=Mode.SUBTRACT)
        with BuildLine():
            ThreePointArc((5.0699800766, -23.3310142565), (5.6839265838, -23.6219028907), (6.28125, -23.945555865))
            Line((6.28125, -23.945555865), (5.0699800766, -22.5020205822))
            Line((5.0699800766, -22.5020205822), (5.0699800766, -23.3310142565))
        make_face()
        with BuildLine():
            Line((-5.0699800766, -22.5020205822), (-6.28125, -23.945555865))
            ThreePointArc((-6.28125, -23.945555865), (-5.6839265838, -23.6219028907), (-5.0699800766, -23.3310142565))
            Line((-5.0699800766, -23.3310142565), (-5.0699800766, -22.5020205822))
        make_face()
        Polygon((-6.3973089761, -10.8116069164), (-6.28125, -23.945555865), (-5.0699800766, -22.5020205822), (-5.0699800766, -12.3934559009), align=None)
        Polygon((6.28125, -23.945555865), (6.3973089761, -10.8116069164), (5.0699800766, -12.3934559009), (5.0699800766, -22.5020205822), align=None)
        with BuildLine():
            Line((-5.0699800766, -12.3934559009), (-5.0699800766, -11.4939857435))
            ThreePointArc((-5.0699800766, -11.4939857435), (-5.7437870583, -11.1725250718), (-6.3973089761, -10.8116069164))
            Line((-6.3973089761, -10.8116069164), (-5.0699800766, -12.3934559009))
        make_face()
        with BuildLine():
            Line((5.0699800766, -12.3934559009), (6.3973089761, -10.8116069164))
            ThreePointArc((6.3973089761, -10.8116069164), (5.7437870583, -11.1725250718), (5.0699800766, -11.4939857435))
            Line((5.0699800766, -11.4939857435), (5.0699800766, -12.3934559009))
        make_face()
        with BuildLine():
            ThreePointArc((12.5617807334, -0.134428631), (12.5623201821, -0.0672152776), (12.5625, 0))
            ThreePointArc((12.5625, 0), (12.5456200156, 0.6510181823), (12.4950254251, 1.300286844))
            ThreePointArc((12.4950254251, 1.300286844), (12.3979510712, 2.0266266272), (12.2586909143, 2.7460705232))
            ThreePointArc((12.2586909143, 2.7460705232), (10.879444135, 6.28125), (8.5075122908, 9.2433024873))
            ThreePointArc((8.5075122908, 9.2433024873), (7.9540856787, 9.723627269), (7.3735941516, 10.1708660171))
            ThreePointArc((7.3735941516, 10.1708660171), (6.7801201382, 10.5757447568), (6.1644717573, 10.9460355474))
            ThreePointArc((6.1644717573, 10.9460355474), (0, 12.5625), (-6.1644717573, 10.9460355474))
            ThreePointArc((-6.1644717573, 10.9460355474), (-6.7801201382, 10.5757447568), (-7.3735941516, 10.1708660171))
            ThreePointArc((-7.3735941516, 10.1708660171), (-7.9540856787, 9.723627269), (-8.5075122908, 9.2433024873))
            ThreePointArc((-8.5075122908, 9.2433024873), (-10.879444135, 6.28125), (-12.2586909143, 2.7460705232))
            ThreePointArc((-12.2586909143, 2.7460705232), (-12.3979510712, 2.0266266272), (-12.4950254251, 1.300286844))
            ThreePointArc((-12.4950254251, 1.300286844), (-12.5489236925, 0.583883902), (-12.5617807334, -0.134428631))
            ThreePointArc((-12.5617807334, -0.134428631), (-10.879444135, -6.28125), (-6.3973089761, -10.8116069164))
            ThreePointArc((-6.3973089761, -10.8116069164), (-5.7437870583, -11.1725250718), (-5.0699800766, -11.4939857435))
            ThreePointArc((-5.0699800766, -11.4939857435), (-4.4175289857, -11.760180437), (-3.7511786235, -11.9893730105))
            ThreePointArc((-3.7511786235, -11.9893730105), (0, -12.5625), (3.7511786235, -11.9893730105))
            ThreePointArc((3.7511786235, -11.9893730105), (4.4175289857, -11.760180437), (5.0699800766, -11.4939857435))
            ThreePointArc((5.0699800766, -11.4939857435), (5.7437870583, -11.1725250718), (6.3973089761, -10.8116069164))
            ThreePointArc((6.3973089761, -10.8116069164), (10.879444135, -6.28125), (12.5617807334, -0.134428631))
        make_face()
        Circle(F0_R, mode=Mode.SUBTRACT)
        with BuildLine():
            Line((5.0699800766, -22.5020205822), (0.8289336287, -17.4477382415))
            Line((0.8289336287, -17.4477382415), (0, -18.4356228716))
            Line((0, -18.4356228716), (3.671321038, -22.8109329082))
            ThreePointArc((3.671321038, -22.8109329082), (4.3783795457, -23.0501879504), (5.0699800766, -23.3310142565))
            Line((5.0699800766, -23.3310142565), (5.0699800766, -22.5020205822))
        make_face()
        Polygon((0, -18.4356228716), (0.8289336287, -17.4477382415), (0, -16.4598536115), (-0.8289336287, -17.4477382415), align=None)
        with BuildLine():
            Line((0, -16.4598536115), (-3.7511786235, -11.9893730105))
            ThreePointArc((-3.7511786235, -11.9893730105), (-4.4175289857, -11.760180437), (-5.0699800766, -11.4939857435))
            Line((-5.0699800766, -11.4939857435), (-5.0699800766, -12.3934559009))
            Line((-5.0699800766, -12.3934559009), (-0.8289336287, -17.4477382415))
            Line((-0.8289336287, -17.4477382415), (0, -16.4598536115))
        make_face()
        with BuildLine():
            Line((16.9280978903, 15.5751607521), (14.6957177414, 9.4417467013))
            Line((14.6957177414, 9.4417467013), (15.9657177414, 9.2178114358))
            Line((15.9657177414, 9.2178114358), (17.9191868635, 14.5849237385))
            ThreePointArc((17.9191868635, 14.5849237385), (17.777731299, 15.2882816033), (17.6766586284, 15.998567657))
            Line((17.6766586284, 15.998567657), (16.9280978903, 15.5751607521))
        make_face()
        Polygon((14.6957177414, 9.4417467013), (14.2546513701, 8.2299268057), (15.5246513701, 8.0059915402), (15.9657177414, 9.2178114358), align=None)
        with BuildLine():
            ThreePointArc((12.2586909143, 2.7460705232), (12.3979510712, 2.0266266272), (12.4950254251, 1.300286844))
            Line((12.4950254251, 1.300286844), (13.2447523803, 1.742020547))
            Line((13.2447523803, 1.742020547), (15.5246513701, 8.0059915402))
            Line((15.5246513701, 8.0059915402), (14.2546513701, 8.2299268057))
            Line((14.2546513701, 8.2299268057), (12.2586909143, 2.7460705232))
        make_face()
        with BuildLine():
            Line((-15.5246513701, 8.0059915402), (-15.9657177414, 9.2178114358))
            Line((-15.9657177414, 9.2178114358), (-21.5905079016, 8.2260091697))
            ThreePointArc((-21.5905079016, 8.2260091697), (-22.1289058982, 7.7518261249), (-22.6934953293, 7.3091515977))
            Line((-22.6934953293, 7.3091515977), (-21.9525338245, 6.8725824347))
            Line((-21.9525338245, 6.8725824347), (-15.5246513701, 8.0059915402))
        make_face()
        Polygon((-14.2546513701, 8.2299268057), (-14.6957177414, 9.4417467013), (-15.9657177414, 9.2178114358), (-15.5246513701, 8.0059915402), align=None)
        with BuildLine():
            ThreePointArc((-8.5075122908, 9.2433024873), (-7.9540856787, 9.723627269), (-7.3735941516, 10.1708660171))
            Line((-7.3735941516, 10.1708660171), (-8.1310102377, 10.5992817546))
            Line((-8.1310102377, 10.5992817546), (-14.6957177414, 9.4417467013))
            Line((-14.6957177414, 9.4417467013), (-14.2546513701, 8.2299268057))
            Line((-14.2546513701, 8.2299268057), (-8.5075122908, 9.2433024873))
        make_face()
    extrude(amount=-F2_DEPTH)


solid = f1.part
